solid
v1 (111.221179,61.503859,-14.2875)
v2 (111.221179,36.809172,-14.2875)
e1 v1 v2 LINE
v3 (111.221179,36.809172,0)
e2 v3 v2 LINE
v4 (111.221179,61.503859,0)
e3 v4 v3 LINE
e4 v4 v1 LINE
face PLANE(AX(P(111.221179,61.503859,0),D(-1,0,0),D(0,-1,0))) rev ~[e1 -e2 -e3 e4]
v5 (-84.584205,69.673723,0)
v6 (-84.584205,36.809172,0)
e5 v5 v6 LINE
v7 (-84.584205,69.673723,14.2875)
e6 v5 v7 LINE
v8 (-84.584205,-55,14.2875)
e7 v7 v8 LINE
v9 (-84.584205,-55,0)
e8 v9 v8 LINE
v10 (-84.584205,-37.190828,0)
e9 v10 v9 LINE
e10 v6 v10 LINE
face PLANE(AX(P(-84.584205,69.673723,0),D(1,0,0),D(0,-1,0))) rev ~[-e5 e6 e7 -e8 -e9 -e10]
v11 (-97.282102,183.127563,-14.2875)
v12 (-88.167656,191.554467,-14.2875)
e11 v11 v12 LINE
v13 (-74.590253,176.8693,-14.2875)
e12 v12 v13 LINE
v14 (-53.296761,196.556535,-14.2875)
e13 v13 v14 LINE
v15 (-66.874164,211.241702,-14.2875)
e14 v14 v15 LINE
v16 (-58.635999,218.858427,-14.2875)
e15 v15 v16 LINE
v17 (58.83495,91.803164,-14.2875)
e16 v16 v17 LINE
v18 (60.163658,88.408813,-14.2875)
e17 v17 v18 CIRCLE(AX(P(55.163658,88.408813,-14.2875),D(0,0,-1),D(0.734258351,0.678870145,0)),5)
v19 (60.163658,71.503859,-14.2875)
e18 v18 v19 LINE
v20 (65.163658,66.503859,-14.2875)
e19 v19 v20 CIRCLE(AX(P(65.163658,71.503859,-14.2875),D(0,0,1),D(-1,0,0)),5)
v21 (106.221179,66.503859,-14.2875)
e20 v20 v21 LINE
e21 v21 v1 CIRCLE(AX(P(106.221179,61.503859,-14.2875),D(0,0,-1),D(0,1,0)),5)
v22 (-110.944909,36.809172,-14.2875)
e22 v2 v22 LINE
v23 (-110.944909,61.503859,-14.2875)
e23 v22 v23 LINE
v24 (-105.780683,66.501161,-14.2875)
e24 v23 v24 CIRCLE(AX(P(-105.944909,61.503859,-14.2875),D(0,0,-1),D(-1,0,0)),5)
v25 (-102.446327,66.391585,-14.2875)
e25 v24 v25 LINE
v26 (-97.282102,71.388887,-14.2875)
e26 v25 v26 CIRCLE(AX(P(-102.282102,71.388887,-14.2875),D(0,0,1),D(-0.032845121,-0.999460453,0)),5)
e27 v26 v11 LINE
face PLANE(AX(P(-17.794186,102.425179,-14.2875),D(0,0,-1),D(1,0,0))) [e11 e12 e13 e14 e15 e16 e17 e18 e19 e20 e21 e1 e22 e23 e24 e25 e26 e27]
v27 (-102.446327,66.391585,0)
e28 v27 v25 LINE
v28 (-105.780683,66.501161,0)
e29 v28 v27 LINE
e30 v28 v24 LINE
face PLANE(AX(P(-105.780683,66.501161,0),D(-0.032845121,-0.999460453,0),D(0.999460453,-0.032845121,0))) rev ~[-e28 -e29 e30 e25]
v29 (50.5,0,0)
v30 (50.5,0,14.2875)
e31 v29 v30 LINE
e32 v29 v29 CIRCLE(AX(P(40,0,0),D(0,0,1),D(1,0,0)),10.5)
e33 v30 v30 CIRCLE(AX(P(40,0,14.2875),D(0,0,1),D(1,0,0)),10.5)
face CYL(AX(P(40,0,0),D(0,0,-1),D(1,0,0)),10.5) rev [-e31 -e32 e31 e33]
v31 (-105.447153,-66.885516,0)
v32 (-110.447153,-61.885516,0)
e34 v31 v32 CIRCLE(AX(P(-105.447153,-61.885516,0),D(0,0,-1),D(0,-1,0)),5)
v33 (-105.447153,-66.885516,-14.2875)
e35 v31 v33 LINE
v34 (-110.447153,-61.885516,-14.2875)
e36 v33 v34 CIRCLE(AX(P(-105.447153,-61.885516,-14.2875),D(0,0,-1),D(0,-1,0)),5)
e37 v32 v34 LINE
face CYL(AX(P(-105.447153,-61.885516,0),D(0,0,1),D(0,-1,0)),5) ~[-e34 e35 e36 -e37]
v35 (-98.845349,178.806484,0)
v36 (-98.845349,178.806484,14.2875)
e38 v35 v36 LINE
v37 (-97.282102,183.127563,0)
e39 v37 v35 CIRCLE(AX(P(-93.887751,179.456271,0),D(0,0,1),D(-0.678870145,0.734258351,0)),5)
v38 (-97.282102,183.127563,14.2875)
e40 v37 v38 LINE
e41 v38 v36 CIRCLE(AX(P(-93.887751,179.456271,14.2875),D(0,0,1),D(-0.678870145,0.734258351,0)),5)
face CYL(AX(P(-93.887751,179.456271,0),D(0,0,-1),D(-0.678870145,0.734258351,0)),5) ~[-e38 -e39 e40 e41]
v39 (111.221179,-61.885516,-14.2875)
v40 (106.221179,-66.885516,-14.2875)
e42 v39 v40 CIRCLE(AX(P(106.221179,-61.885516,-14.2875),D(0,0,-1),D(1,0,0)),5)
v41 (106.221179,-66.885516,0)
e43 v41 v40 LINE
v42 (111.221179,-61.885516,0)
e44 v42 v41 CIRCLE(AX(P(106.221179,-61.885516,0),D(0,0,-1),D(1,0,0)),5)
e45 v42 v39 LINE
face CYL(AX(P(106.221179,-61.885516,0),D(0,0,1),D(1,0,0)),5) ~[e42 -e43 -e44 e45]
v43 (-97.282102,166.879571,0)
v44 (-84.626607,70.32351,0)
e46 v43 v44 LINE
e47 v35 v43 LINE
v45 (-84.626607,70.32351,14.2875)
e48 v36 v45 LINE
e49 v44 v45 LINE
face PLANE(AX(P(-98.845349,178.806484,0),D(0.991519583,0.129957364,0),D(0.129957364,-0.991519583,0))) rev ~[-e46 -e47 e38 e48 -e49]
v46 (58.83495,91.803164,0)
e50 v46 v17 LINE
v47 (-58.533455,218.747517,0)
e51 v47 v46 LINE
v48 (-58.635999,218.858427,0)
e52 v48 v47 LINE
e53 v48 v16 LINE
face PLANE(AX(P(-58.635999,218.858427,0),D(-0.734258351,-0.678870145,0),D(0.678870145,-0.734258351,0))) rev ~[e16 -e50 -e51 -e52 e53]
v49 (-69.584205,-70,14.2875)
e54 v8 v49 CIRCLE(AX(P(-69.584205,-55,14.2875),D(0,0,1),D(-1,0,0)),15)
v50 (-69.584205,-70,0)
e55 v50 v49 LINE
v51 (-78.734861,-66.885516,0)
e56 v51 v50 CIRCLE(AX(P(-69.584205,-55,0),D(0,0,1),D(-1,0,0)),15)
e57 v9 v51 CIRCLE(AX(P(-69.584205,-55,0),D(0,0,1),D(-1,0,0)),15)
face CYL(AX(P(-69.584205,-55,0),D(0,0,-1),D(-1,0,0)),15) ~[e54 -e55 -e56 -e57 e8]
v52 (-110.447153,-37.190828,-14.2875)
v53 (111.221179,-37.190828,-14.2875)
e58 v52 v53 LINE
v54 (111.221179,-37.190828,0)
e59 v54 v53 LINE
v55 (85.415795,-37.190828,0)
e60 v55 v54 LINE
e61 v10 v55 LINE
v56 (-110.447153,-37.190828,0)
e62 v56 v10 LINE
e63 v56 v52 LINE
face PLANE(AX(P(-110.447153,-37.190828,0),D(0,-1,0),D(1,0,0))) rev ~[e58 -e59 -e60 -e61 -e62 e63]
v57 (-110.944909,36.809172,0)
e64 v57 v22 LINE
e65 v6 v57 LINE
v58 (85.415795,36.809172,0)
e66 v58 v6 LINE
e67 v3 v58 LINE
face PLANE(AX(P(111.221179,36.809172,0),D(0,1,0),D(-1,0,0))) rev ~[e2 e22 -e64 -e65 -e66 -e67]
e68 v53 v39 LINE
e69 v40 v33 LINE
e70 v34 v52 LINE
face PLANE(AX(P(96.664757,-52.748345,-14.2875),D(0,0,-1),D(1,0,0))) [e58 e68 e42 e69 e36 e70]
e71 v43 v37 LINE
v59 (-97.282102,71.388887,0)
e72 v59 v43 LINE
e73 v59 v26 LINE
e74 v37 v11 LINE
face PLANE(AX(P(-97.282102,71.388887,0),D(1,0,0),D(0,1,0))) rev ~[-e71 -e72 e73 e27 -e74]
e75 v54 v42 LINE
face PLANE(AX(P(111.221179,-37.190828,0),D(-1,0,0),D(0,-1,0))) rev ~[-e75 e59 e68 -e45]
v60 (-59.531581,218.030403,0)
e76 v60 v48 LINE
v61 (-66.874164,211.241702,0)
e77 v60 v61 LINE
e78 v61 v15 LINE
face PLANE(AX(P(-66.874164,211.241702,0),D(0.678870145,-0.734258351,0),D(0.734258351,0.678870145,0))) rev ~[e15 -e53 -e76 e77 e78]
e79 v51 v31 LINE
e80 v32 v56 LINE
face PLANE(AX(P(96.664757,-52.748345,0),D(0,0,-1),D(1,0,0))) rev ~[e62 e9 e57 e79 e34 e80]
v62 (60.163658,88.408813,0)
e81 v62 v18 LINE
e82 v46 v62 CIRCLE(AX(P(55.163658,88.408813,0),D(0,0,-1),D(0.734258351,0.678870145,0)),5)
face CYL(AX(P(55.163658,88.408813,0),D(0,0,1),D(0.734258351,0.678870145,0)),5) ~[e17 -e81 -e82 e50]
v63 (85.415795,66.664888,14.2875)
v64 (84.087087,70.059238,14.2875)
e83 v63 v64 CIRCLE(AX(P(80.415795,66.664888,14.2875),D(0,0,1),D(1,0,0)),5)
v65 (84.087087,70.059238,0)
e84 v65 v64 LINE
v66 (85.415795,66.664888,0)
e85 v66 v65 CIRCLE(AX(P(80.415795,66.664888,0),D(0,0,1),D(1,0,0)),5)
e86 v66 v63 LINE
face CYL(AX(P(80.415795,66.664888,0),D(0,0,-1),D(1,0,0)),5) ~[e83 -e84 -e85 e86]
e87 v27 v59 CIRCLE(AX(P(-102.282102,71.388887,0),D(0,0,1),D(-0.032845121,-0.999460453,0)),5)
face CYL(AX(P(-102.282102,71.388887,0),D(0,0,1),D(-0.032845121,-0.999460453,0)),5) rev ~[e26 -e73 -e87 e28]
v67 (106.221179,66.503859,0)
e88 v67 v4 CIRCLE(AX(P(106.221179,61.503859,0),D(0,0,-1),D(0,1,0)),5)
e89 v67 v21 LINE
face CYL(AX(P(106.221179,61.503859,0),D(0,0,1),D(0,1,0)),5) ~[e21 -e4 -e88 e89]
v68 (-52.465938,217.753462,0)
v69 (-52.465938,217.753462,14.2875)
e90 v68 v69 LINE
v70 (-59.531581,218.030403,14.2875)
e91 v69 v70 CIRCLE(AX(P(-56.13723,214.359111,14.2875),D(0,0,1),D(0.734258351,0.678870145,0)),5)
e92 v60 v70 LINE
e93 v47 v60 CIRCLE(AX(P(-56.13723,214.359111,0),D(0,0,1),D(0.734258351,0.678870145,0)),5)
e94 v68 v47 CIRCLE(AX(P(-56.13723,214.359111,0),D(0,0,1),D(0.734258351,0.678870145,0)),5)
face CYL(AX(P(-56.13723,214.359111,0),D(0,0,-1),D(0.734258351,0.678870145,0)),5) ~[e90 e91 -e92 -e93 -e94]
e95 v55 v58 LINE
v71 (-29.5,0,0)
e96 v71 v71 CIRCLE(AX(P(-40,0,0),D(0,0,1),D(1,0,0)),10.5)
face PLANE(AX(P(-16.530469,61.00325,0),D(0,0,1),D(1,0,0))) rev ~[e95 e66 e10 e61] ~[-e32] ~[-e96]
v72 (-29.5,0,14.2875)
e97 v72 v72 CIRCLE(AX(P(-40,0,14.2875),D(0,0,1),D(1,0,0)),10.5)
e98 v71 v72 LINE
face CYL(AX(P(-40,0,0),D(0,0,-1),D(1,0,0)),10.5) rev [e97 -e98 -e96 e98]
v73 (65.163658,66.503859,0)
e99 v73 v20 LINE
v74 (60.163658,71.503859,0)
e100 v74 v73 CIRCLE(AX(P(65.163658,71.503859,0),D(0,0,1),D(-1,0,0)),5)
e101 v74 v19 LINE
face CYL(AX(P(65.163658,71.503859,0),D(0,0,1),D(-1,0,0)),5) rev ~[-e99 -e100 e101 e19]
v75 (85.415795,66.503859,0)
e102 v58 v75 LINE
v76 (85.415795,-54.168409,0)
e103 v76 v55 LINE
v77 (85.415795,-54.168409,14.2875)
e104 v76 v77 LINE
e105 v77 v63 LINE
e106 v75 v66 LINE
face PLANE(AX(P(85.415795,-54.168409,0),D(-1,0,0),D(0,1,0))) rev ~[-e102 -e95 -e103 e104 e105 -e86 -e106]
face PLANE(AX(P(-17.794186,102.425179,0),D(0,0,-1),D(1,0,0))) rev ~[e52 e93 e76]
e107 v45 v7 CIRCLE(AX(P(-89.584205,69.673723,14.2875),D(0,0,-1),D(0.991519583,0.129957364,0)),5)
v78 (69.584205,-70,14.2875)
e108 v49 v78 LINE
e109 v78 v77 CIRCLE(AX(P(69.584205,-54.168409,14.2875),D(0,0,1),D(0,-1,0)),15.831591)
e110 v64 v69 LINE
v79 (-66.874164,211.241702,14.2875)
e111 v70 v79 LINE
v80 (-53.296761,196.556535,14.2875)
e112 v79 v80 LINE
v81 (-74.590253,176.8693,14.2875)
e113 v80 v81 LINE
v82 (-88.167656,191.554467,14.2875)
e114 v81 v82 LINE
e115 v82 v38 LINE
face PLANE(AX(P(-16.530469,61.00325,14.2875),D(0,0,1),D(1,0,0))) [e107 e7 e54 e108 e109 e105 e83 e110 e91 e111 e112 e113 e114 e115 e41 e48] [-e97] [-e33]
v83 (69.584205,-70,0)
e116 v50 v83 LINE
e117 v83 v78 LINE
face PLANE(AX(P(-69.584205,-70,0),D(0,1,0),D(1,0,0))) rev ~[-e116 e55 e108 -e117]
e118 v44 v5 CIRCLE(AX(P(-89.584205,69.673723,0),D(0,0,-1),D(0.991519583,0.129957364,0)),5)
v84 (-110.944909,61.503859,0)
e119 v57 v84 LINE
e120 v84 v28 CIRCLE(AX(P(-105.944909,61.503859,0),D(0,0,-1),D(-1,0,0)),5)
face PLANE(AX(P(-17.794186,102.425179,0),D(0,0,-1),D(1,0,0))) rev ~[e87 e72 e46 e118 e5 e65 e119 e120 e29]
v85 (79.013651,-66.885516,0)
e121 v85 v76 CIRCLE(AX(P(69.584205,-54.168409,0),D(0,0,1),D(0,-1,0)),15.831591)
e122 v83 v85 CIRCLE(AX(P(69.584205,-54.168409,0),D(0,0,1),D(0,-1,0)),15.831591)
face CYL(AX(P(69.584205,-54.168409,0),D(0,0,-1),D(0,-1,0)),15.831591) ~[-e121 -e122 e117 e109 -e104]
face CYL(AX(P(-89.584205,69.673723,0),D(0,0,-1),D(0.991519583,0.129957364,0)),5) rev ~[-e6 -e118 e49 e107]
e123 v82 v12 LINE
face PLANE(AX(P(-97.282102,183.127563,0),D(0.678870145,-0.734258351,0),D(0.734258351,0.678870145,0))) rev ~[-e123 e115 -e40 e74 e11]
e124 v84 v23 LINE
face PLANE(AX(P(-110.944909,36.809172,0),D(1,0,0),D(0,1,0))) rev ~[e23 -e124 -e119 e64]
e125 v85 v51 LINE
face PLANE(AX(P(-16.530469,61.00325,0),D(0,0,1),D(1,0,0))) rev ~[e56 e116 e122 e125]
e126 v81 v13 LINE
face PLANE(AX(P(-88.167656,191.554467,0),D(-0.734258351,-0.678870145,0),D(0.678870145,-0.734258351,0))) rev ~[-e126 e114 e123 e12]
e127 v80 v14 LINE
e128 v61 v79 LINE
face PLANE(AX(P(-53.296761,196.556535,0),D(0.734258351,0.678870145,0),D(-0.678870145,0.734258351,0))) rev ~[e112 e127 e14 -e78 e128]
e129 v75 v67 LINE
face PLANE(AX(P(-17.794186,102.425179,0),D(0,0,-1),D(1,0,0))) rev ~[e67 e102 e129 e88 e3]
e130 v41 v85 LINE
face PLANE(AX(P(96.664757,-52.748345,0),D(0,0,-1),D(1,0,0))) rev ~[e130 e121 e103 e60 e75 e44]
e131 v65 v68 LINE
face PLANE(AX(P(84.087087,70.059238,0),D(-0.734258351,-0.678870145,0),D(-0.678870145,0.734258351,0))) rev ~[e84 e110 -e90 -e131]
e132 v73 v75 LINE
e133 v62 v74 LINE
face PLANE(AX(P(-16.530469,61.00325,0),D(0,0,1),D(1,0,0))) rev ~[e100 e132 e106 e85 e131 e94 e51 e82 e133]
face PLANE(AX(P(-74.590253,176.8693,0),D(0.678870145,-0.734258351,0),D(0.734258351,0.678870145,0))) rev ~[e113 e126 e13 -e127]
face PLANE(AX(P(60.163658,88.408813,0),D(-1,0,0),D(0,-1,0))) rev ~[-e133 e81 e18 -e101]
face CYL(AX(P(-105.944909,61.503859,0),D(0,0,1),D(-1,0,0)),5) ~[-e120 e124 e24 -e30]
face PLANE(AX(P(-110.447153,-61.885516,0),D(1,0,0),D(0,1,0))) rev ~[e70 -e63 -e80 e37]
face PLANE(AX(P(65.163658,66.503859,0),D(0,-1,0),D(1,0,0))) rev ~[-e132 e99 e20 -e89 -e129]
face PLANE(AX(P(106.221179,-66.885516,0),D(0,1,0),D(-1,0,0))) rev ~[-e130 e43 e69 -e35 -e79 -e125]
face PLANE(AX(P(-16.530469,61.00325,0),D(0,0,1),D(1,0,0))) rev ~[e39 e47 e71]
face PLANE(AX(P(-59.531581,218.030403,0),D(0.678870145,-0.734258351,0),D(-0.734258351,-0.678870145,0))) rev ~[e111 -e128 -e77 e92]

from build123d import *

# Parameters (mm, degrees)
F0_R     = 10.5
F1_DEPTH = 14.2875
F3_DEPTH = 14.2875
F5_DEPTH = 14.2875


# Not quite as in the source:
# - a length typed as a fraction of an inch, garbled in the dataset ("3 / 203.2 mm" for 3/8 in), is restored
# - a feature names something its author has since deleted; it is built from what else it names


with BuildPart() as f1:
    # F0 (on Top) → F1 (new body)
    with BuildSketch(Plane.XY):
        with BuildLine():
            ThreePointArc((-84.5842045546, -55), (-80.1908062724, -65.6066017178), (-69.5842045546, -70))
            Line((-69.5842045546, -70), (69.5842045546, -70))
            ThreePointArc((69.5842045546, -70), (80.7788298305, -65.363034385), (85.4157954454, -54.1684091091))
            Line((85.4157954454, -54.1684091091), (85.4157954454, 66.6648875964))
            ThreePointArc((85.4157954454, 66.6648875964), (85.0717839963, 68.487460123), (84.0870871996, 70.0592383231))
            Line((84.0870871996, 70.0592383231), (-52.4659380977, 217.7534620916))
            ThreePointArc((-52.4659380977, 217.7534620916), (-55.9414029733, 219.3552750765), (-59.5315805785, 218.030403119))
            Line((-59.5315805785, 218.030403119), (-66.8741640868, 211.2417016656))
            Line((-66.8741640868, 211.2417016656), (-53.29676118, 196.556534649))
            Line((-53.29676118, 196.556534649), (-63.9435072671, 186.7129175415))
            Line((-63.9435072671, 186.7129175415), (-74.5902533541, 176.8693004341))
            Line((-74.5902533541, 176.8693004341), (-88.1676562609, 191.5544674507))
            Line((-88.1676562609, 191.5544674507), (-97.2821017235, 183.1275630663))
            ThreePointArc((-97.2821017235, 183.1275630663), (-98.5895263572, 181.1572441104), (-98.845348912, 178.8064844924))
            Line((-98.845348912, 178.8064844924), (-84.6266066394, 70.3235099279))
            ThreePointArc((-84.6266066394, 70.3235099279), (-84.5948163368, 69.9993075241), (-84.5842045546, 69.673723108))
            Line((-84.5842045546, 69.673723108), (-84.5842045546, -55))
        make_face()
        with Locations((-40, 0)):
            Circle(F0_R, mode=Mode.SUBTRACT)
        with Locations((40, 0)):
            Circle(F0_R, mode=Mode.SUBTRACT)
    extrude(amount=F1_DEPTH)

    # F2 (on face) → F3 (join)
    with BuildSketch(Plane(origin=(0, 0, 0), x_dir=(1, 0, 0), z_dir=(0, 0, -1))):
        with BuildLine():
            ThreePointArc((111.2211793661, 61.8855160475), (109.756713272, 65.4210499534), (106.2211793661, 66.8855160475))
            Line((106.2211793661, 66.8855160475), (79.0136510523, 66.8855160475))
            ThreePointArc((79.0136510523, 66.8855160475), (83.7249684911, 61.287261926), (85.4157954454, 54.1684091091))
            Line((85.4157954454, 54.1684091091), (85.4157954454, 37.1908284724))
            Line((85.4157954454, 37.1908284724), (111.2211793661, 37.1908284724))
            Line((111.2211793661, 37.1908284724), (111.2211793661, 61.8855160475))
        make_face()
        with BuildLine():
            ThreePointArc((85.4157954454, 54.1684091091), (83.7249684911, 61.287261926), (79.0136510523, 66.8855160475))
            Line((79.0136510523, 66.8855160475), (-78.7348607215, 66.8855160475))
            ThreePointArc((-78.7348607215, 66.8855160475), (-83.0426562208, 61.623449158), (-84.5842045546, 55))
            Line((-84.5842045546, 55), (-84.5842045546, 37.1908284724))
            Line((-84.5842045546, 37.1908284724), (85.4157954454, 37.1908284724))
            Line((85.4157954454, 37.1908284724), (85.4157954454, 54.1684091091))
        make_face()
        with BuildLine():
            ThreePointArc((-84.5842045546, 55), (-83.0426562208, 61.623449158), (-78.7348607215, 66.8855160475))
            Line((-78.7348607215, 66.8855160475), (-105.4471534491, 66.8855160475))
            ThreePointArc((-105.4471534491, 66.8855160475), (-108.982687355, 65.4210499534), (-110.4471534491, 61.8855160475))
            Line((-110.4471534491, 61.8855160475), (-110.4471534491, 37.1908284724))
            Line((-110.4471534491, 37.1908284724), (-84.5842045546, 37.1908284724))
            Line((-84.5842045546, 37.1908284724), (-84.5842045546, 55))
        make_face()
    extrude(amount=F3_DEPTH)

    # F4 (on face) → F5 (join)
    with BuildSketch(Plane(origin=(0, 0, 0), x_dir=(1, 0, 0), z_dir=(0, 0, -1))):
        with BuildLine():
            Line((111.2211793661, -36.8091715276), (-110.9449085174, -36.8091715276))
            Line((-110.9449085174, -36.8091715276), (-110.9449085174, -61.5038591027))
            ThreePointArc((-110.9449085174, -61.5038591027), (-109.4218951426, -65.0969864325), (-105.7806829141, -66.5011613701))
            Line((-105.7806829141, -66.5011613701), (-102.4463273268, -66.3915849369))
            ThreePointArc((-102.4463273268, -66.3915849369), (-98.8051150983, -67.7957598744), (-97.2821017235, -71.3888872042))
            Line((-97.2821017235, -71.3888872042), (-97.2821017235, -183.1275630663))
            Line((-97.2821017235, -183.1275630663), (-88.1676562609, -191.5544674507))
            Line((-88.1676562609, -191.5544674507), (-74.5902533541, -176.8693004341))
            Line((-74.5902533541, -176.8693004341), (-53.29676118, -196.556534649))
            Line((-53.29676118, -196.556534649), (-66.8741640868, -211.2417016656))
            Line((-66.8741640868, -211.2417016656), (-58.6359989162, -218.8584272777))
            Line((-58.6359989162, -218.8584272777), (58.8349498664, -91.8031638881))
            ThreePointArc((58.8349498664, -91.8031638881), (59.8196466631, -90.2313856879), (60.1636581123, -88.4088131614))
            Line((60.1636581123, -88.4088131614), (60.1636581123, -71.5038591027))
            ThreePointArc((60.1636581123, -71.5038591027), (61.6281242064, -67.9683251968), (65.1636581123, -66.5038591027))
            Line((65.1636581123, -66.5038591027), (106.2211793661, -66.5038591027))
            ThreePointArc((106.2211793661, -66.5038591027), (109.756713272, -65.0393930087), (111.2211793661, -61.5038591027))
            Line((111.2211793661, -61.5038591027), (111.2211793661, -36.8091715276))
        make_face()
    extrude(amount=F5_DEPTH)


solid = f1.part
